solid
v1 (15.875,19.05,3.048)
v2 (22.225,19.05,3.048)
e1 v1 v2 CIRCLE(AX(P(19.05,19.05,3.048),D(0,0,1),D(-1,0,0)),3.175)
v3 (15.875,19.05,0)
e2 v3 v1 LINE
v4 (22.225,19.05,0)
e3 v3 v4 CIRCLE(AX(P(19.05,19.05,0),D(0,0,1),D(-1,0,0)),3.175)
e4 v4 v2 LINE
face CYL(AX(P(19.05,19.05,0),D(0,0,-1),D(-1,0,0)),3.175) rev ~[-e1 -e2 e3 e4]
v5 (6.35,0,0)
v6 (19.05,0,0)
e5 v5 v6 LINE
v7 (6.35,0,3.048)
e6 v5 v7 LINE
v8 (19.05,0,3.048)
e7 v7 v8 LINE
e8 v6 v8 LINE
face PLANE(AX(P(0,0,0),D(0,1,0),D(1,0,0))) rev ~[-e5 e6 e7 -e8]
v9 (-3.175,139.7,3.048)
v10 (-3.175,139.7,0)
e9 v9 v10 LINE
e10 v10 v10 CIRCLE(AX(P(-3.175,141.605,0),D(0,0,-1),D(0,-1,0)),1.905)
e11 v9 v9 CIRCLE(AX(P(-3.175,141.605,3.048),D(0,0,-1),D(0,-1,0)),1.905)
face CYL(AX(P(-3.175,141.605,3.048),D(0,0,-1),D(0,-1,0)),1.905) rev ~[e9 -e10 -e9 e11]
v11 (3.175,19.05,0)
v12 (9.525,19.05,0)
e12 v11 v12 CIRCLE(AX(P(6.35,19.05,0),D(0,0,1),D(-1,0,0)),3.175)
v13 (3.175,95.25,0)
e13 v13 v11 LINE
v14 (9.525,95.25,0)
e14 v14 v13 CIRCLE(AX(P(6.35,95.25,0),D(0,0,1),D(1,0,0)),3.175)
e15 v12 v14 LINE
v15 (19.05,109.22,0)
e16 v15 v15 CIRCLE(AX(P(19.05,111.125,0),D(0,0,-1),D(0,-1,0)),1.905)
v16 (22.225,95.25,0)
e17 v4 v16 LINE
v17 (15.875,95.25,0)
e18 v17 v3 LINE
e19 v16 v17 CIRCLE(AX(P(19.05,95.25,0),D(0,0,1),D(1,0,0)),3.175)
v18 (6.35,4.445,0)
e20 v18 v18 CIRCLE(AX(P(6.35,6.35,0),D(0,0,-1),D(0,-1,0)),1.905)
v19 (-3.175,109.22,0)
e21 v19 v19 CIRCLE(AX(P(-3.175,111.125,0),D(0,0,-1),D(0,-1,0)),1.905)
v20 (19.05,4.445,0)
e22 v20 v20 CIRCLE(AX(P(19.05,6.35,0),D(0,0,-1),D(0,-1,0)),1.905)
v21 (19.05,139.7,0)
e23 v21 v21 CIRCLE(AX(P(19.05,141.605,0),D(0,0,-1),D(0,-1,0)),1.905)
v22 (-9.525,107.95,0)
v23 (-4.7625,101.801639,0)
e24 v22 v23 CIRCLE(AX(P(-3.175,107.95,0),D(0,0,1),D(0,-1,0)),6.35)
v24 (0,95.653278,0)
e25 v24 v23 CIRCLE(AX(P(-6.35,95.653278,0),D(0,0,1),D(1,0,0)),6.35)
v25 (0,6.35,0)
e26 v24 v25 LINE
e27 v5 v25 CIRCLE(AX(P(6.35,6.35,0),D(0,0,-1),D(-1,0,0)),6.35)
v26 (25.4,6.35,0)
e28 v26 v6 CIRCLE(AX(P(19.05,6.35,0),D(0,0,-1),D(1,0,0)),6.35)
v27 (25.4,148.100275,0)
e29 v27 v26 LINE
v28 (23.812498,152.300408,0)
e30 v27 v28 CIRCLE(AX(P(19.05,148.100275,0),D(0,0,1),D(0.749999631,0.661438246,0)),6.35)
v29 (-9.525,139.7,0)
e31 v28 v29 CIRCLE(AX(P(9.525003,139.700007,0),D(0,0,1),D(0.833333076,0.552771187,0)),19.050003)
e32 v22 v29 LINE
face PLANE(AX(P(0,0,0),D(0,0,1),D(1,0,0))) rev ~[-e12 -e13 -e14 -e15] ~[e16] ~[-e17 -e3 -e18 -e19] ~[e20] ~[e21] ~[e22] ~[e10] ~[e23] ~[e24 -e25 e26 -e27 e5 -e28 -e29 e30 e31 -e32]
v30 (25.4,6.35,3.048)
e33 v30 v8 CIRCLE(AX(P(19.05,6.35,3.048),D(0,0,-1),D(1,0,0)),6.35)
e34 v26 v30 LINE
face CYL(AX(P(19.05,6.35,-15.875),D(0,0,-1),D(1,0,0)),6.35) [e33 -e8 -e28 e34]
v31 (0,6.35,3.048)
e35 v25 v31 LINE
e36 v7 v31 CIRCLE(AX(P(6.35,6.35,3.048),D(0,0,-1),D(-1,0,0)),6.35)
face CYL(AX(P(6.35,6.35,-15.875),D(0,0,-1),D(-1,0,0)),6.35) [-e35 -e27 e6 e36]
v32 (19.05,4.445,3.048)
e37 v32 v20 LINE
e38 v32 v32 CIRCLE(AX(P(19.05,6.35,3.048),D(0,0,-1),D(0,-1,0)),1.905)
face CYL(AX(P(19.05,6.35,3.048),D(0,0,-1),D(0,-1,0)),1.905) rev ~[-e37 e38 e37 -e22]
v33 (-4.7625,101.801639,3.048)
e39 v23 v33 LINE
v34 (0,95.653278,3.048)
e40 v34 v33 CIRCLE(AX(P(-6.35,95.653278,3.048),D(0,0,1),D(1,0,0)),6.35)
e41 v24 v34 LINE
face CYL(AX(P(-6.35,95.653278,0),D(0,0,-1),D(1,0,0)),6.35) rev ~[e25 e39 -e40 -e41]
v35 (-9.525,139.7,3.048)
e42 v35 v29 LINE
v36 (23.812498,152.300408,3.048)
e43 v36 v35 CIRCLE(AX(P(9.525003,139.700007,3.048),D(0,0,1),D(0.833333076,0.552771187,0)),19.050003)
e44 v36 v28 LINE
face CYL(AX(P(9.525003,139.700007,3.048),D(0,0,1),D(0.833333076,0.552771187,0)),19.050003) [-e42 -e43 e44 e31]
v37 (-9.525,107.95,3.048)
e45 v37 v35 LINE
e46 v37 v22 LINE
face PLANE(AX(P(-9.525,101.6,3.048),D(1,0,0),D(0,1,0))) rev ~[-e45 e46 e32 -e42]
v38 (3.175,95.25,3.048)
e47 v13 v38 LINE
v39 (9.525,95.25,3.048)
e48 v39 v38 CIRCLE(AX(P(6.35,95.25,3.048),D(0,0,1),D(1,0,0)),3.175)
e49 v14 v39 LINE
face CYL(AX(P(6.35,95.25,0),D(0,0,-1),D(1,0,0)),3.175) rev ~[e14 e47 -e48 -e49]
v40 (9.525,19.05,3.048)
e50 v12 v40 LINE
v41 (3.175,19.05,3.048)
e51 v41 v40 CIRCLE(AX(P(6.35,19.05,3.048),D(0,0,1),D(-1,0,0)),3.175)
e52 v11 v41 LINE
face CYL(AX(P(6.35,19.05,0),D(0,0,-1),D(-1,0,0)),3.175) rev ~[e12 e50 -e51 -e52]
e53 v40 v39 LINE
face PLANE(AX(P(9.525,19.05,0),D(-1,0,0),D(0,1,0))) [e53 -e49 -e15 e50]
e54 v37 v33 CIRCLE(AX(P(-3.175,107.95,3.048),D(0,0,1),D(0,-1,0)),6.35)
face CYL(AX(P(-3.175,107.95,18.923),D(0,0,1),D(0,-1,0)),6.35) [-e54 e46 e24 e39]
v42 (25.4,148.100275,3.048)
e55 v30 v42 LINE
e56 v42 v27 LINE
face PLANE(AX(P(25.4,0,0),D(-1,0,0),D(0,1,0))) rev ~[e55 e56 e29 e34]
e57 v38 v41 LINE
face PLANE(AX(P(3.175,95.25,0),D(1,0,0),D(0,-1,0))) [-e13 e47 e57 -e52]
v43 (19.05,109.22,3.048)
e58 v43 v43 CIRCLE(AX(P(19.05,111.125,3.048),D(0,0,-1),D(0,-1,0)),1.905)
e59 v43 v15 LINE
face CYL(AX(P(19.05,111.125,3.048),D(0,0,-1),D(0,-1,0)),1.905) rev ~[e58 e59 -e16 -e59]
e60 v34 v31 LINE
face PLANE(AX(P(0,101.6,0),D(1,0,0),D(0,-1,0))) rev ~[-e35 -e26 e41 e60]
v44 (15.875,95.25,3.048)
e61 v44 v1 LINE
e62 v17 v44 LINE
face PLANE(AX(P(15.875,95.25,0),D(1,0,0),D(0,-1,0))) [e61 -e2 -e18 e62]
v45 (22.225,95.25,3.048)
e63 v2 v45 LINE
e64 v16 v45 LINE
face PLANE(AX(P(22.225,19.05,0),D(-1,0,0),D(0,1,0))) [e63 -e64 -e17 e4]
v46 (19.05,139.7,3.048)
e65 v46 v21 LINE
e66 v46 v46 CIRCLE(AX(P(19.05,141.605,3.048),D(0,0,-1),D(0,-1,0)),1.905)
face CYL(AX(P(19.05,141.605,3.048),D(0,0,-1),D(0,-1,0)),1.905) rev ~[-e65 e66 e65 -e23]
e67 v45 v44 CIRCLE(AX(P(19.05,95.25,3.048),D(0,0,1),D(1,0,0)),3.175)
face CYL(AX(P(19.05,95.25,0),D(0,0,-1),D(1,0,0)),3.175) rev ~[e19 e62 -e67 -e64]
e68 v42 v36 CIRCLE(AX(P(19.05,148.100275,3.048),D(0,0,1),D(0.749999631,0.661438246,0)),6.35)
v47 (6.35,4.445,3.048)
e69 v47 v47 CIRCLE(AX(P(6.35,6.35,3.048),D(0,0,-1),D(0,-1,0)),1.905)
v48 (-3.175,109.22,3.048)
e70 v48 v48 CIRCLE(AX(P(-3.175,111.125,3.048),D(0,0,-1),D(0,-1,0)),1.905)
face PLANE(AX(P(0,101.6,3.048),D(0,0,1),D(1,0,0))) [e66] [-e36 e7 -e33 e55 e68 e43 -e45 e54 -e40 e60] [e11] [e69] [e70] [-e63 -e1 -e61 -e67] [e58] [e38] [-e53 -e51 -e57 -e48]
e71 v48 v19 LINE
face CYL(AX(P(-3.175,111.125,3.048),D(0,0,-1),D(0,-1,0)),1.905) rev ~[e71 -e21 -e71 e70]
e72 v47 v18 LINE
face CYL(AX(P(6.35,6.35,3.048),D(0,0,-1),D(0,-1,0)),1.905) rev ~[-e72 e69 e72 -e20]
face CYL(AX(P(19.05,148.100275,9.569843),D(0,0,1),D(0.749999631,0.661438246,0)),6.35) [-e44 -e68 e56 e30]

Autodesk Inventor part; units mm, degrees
ref_plane "YZ Plane" through (0, 0, 0) normal (1, 0, 0) x (0, 1, 0)
ref_plane "XZ Plane" through (0, 0, 0) normal (0, 1, 0) x (-1, 0, 0)
ref_plane "XY Plane" through (0, 0, 0) normal (0, 0, 1) x (1, 0, 0)
sketch "Sketch1" plane through (0, 0, 0) normal (0, 0, 1) x (1, 0, 0)
  line L0 (0, 0) -> (25.4, 0)
  line L1 (25.4, 0) -> (25.4, 101.6)
  line L2 (25.4, 101.6) -> (0, 101.6)
  line L3 (0, 101.6) -> (0, 0)
  line L4 (6.35, 95.25) -> (6.35, 19.05) construction
  line L5 (3.175, 95.25) -> (3.175, 19.05)
  line L6 (9.525, 19.05) -> (9.525, 95.25)
  arc A0 (9.525, 95.25) -> (3.175, 95.25) centre (6.35, 95.25) ccw
  arc A1 (3.175, 19.05) -> (9.525, 19.05) centre (6.35, 19.05) ccw
  line L7 (19.05, 95.25) -> (19.05, 19.05) construction
  line L8 (15.875, 95.25) -> (15.875, 19.05)
  line L9 (22.225, 19.05) -> (22.225, 95.25)
  arc A2 (22.225, 95.25) -> (15.875, 95.25) centre (19.05, 95.25) ccw
  arc A3 (15.875, 19.05) -> (22.225, 19.05) centre (19.05, 19.05) ccw
  line L10 (6.35, 57.15) -> (19.05, 57.15) construction
  point P0 (12.7, 57.15)
  point P1 (12.7, 0)
  dimension "d2" = 6.35
  dimension "d3" = 76.2
  dimension "d4" = 19.05
  dimension "d5" = 6.35
  dimension "d7" = 12.7
  dimension "d8" = 3.175
extrude "Plate1" add sketch "Sketch1" along normal blind 3.048
sketch "Sketch2" plane through (0, 0, 3.048) normal (0, 0, 1) x (1, 0, 0)
  arc A0 (25.4, 150.2303) -> (-9.525, 139.7) centre (9.525, 139.7) ccw
  line L0 (25.4, 0) -> (25.4, 101.6)
  line L1 (25.4, 101.6) -> (0, 101.6)
  line L2 (0, 101.6) -> (-9.525, 101.6)
  line L3 (-9.525, 101.6) -> (-9.525, 139.7)
  line L4 (25.4, 101.6) -> (25.4, 150.2303)
  point P0 (0, 0)
  point P1 (28.575, 139.7)
  dimension "d10" = 38.1
  dimension "d11" = 3.175
  dimension "d12" = 38.1
  dimension "d13" = 34.925
sheet face with bend "Face2" sketch "Sketch2" thickness 3.048 toward (0, 0, -1) bend radius 3.048
bend "Bend1"
fillet "Corner Round1" radius 6.35 5 edges at (-9.525, 101.6, 1.524) (0, 101.6, 1.524) (25.4, 150.2303, 1.524) (0, 0, 1.524) (25.4, 0, 1.524)
sketch "Sketch3" plane through (0, 0, 3.048) normal (0, 0, 1) x (1, 0, 0)
  line L0 (6.35, 6.35) -> (19.05, 6.35) construction
  line L1 (19.05, 0) -> (6.35, 0) projected
  line L2 (25.4, 148.1003) -> (25.4, 6.35) projected
  line L3 (-9.525, 139.7) -> (-9.525, 107.95) projected
  line L4 (-3.175, 111.125) -> (19.05, 111.125) construction
  line L5 (-9.525, 123.825) -> (25.4, 123.825) construction
  point P0 (0, 0)
  point P1 (12.7, 6.35)
  point P2 (12.7, 0)
  point P3 (19.05, 141.605)
  point P4 (-3.175, 141.605)
  point P5 (7.9375, 123.825)
  point P6 (7.9375, 111.125)
  dimension "d20" = 6.35
  dimension "d21" = 6.35
  dimension "d22" = 6.35
  dimension "d23" = 3.175
  dimension "d25" = 30.48
hole "Hole1" at (6.35, 6.35, 3.048) at (19.05, 6.35, 3.048) at (-3.175, 111.125, 3.048) at (19.05, 111.125, 3.048) at (19.05, 141.605, 3.048) at (-3.175, 141.605, 3.048) direction (0, 0, -1) diameter 3.81 end through all clearance for "Flat Head Machine Screw (82)" size "#6" standard "Ansi Unified Screw Threads"
equation "\"d31\" = Thickness"
equation "\"d9\" = Thickness"
equation "\"d14\" = BendRadius"
equation "\"d15\" = BendReliefWidth"
equation "\"d17\" = MinimumRemnant"
equation "\"d16\" = BendReliefDepth"
equation "\"d18\" = TransitionRadius"
equation "\"BendRadius\" = Thickness"
equation "\"BendReliefWidth\" = Thickness"
equation "\"BendReliefDepth\" = 0.5 * Thickness"
equation "\"CornerReliefSize\" = 4 * Thickness"
equation "\"MinimumRemnant\" = 2 * Thickness"
equation "\"TransitionRadius\" = BendRadius"
equation "\"JacobiRadiusSize\" = BendRadius"
equation "\"GapSize\" = Thickness"
equation "\"Thickness\" = 3.048"
properties part number "Side Plate"
